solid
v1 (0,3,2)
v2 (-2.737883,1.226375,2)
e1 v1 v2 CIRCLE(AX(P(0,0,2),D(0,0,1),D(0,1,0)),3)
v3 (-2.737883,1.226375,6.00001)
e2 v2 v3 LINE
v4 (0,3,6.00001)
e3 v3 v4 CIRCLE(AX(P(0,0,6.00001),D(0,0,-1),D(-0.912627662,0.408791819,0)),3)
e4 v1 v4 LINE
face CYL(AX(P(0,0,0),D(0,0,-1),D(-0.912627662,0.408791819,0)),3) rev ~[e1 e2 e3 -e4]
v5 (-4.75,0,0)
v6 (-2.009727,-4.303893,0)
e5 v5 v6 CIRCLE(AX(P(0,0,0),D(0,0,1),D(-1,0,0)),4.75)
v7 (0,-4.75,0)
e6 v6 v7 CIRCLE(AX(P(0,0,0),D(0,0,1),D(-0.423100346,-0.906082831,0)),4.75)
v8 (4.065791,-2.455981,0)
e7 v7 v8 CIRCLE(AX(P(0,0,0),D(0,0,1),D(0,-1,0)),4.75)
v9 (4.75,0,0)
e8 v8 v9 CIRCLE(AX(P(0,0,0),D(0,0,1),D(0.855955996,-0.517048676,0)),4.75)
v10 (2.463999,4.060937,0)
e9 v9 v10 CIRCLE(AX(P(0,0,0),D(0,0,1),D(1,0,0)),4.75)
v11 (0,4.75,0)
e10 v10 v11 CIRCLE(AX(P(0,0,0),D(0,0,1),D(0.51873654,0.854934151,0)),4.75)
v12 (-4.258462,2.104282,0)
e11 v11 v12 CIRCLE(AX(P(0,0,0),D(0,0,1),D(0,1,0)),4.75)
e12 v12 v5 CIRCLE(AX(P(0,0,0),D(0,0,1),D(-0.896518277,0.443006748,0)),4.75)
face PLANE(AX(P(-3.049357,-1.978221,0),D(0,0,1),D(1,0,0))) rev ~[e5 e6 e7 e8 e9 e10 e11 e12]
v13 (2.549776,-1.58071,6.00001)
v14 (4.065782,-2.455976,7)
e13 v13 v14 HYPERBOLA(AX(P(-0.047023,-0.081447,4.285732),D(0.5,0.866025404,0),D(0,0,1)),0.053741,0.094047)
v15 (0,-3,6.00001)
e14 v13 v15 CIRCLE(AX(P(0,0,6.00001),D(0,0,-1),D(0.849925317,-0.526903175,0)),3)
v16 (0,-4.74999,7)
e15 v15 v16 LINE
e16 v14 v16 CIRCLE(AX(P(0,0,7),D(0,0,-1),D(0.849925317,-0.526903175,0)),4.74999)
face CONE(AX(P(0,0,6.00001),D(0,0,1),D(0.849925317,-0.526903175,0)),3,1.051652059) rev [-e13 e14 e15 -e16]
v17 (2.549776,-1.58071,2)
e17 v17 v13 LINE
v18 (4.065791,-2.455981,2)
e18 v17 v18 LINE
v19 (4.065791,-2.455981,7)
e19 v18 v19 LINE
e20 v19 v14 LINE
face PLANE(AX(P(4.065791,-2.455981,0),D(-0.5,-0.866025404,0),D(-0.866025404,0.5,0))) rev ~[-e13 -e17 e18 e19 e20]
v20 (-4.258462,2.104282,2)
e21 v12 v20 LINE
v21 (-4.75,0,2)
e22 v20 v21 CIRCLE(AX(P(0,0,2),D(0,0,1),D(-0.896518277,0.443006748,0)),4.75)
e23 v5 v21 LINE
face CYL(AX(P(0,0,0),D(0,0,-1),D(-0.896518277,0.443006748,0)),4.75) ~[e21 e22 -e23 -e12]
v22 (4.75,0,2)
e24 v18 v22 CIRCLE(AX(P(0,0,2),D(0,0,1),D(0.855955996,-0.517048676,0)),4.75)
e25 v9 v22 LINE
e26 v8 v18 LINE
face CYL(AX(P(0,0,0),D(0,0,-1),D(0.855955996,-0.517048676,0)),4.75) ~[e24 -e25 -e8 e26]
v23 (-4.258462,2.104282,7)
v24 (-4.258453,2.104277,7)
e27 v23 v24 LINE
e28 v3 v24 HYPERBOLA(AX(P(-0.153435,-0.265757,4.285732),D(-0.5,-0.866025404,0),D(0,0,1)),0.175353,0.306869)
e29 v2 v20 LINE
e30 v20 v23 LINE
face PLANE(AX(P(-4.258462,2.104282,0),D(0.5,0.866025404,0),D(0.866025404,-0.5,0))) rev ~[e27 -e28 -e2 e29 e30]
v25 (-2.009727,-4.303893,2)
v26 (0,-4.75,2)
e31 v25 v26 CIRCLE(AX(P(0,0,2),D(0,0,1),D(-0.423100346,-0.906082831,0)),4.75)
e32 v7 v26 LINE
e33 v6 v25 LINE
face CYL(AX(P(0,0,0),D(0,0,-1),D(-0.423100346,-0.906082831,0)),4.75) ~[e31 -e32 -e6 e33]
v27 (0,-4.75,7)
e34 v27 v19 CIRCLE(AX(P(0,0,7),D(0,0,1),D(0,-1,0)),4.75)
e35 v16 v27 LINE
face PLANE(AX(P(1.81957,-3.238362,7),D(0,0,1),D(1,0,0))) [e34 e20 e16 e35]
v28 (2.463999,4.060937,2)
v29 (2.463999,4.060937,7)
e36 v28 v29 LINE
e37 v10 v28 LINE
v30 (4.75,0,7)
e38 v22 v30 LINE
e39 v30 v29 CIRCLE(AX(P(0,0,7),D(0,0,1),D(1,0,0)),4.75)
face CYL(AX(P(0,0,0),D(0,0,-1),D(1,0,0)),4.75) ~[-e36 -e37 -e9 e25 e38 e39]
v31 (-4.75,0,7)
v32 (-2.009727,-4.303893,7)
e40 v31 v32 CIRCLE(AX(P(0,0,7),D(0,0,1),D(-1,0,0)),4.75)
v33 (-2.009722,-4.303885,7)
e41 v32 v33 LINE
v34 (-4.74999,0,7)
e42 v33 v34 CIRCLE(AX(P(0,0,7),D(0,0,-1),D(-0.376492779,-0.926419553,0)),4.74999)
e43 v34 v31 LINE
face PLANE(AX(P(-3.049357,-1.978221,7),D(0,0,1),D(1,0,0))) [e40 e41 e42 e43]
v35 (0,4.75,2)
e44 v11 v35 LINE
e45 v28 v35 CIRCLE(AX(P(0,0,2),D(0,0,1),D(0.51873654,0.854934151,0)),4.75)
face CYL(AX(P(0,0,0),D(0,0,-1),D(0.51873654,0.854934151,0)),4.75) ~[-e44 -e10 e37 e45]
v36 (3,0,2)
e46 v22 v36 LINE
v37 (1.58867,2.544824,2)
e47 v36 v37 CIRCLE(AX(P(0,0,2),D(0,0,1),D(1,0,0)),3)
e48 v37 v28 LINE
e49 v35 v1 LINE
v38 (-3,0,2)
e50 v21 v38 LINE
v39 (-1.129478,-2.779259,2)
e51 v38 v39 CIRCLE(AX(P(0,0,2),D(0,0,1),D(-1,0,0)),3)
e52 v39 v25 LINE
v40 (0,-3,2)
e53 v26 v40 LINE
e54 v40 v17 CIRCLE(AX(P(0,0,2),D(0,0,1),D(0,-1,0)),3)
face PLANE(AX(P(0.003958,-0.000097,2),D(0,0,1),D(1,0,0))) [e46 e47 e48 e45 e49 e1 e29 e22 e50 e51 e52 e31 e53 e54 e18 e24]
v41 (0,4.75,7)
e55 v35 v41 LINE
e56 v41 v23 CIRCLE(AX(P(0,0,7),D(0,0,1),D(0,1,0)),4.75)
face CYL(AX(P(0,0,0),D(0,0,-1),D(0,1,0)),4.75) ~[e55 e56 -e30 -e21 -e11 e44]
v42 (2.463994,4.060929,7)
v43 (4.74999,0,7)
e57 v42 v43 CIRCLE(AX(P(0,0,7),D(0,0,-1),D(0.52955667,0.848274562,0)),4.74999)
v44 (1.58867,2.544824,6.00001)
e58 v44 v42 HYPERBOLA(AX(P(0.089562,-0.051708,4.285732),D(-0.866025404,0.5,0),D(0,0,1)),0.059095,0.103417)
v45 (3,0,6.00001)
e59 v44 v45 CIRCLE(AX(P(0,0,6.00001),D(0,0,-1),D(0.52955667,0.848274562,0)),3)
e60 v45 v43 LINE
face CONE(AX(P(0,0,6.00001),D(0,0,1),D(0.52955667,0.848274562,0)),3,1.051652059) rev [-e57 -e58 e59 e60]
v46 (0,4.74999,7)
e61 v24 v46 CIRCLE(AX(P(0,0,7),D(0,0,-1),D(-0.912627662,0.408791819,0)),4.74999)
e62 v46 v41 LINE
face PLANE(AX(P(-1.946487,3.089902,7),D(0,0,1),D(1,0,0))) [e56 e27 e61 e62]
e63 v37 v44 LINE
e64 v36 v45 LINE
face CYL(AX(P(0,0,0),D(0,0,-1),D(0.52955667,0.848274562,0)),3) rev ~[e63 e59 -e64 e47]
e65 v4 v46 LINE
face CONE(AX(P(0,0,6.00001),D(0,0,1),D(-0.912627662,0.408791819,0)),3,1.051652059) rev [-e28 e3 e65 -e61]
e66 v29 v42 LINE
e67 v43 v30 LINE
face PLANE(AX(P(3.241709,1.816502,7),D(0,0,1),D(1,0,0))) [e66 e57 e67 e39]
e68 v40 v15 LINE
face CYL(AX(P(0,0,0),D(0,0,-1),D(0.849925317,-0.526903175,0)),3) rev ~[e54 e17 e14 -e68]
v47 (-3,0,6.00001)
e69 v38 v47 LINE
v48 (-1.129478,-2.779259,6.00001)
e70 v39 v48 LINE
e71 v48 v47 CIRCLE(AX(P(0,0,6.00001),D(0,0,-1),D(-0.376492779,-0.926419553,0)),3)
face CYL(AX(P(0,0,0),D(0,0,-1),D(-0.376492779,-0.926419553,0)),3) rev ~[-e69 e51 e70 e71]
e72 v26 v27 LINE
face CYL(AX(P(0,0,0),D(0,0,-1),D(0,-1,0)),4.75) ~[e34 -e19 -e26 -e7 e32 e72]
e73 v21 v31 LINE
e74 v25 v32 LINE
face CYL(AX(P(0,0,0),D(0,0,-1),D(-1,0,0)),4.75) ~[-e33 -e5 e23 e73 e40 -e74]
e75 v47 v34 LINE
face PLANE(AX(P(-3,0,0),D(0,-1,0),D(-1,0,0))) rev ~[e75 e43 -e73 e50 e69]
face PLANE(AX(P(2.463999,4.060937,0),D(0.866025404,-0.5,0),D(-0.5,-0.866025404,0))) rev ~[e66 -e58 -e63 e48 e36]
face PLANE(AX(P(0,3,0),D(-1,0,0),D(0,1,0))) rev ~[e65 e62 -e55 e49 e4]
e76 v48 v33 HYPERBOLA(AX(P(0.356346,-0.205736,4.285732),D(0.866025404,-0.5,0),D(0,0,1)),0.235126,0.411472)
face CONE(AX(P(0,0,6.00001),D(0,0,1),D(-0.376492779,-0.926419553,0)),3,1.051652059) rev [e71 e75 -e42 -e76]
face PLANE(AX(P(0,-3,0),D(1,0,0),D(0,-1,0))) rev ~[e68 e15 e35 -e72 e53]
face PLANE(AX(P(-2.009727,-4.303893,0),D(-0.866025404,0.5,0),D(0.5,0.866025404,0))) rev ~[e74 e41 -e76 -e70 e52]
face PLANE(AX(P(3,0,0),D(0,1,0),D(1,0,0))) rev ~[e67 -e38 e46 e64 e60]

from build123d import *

# Parameters (mm, degrees)
F1_DEPTH   = 2
F2_DEPTH   = 7
F3_SIZE2   = 1.74999
F3_SIZE    = 0.99999
F3_2_SIZE2 = 1.74999
F3_2_SIZE  = 0.99999
F3_3_SIZE2 = 1.74999
F3_3_SIZE  = 0.99999
F3_4_SIZE2 = 1.74999
F3_4_SIZE  = 0.99999


# Not quite as in the source:
# - a fillet or chamfer is up to 0.001 mm smaller than in the source, because OpenCascade refuses the exact size


with BuildPart() as f1:
    # F0 (on Top) → F1 (new body)
    with BuildSketch(Plane.XY):
        with BuildLine():
            ThreePointArc((2.5497759502, -1.5807095255), (2.8852493697, -0.8217883394), (3, 0))
            ThreePointArc((3, 0), (2.6235481729, 1.4549896853), (1.5886700104, 2.544823687))
            ThreePointArc((1.5886700104, 2.544823687), (0.8262956308, 2.8839617769), (0, 3))
            ThreePointArc((0, 3), (-1.6310845521, 2.51784892), (-2.7378829853, 1.226375456))
            ThreePointArc((-2.7378829853, 1.226375456), (-2.9337389928, 0.6270370979), (-3, 0))
            ThreePointArc((-3, 0), (-2.488818496, -1.6750470125), (-1.1294783373, -2.7792586575))
            ThreePointArc((-1.1294783373, -2.7792586575), (-0.5754233343, -2.944297537), (0, -3))
            ThreePointArc((0, -3), (1.4590872872, -2.6212715022), (2.5497759502, -1.5807095255))
        make_face()
        with BuildLine():
            Line((0, -4.75), (0, -3))
            ThreePointArc((0, -3), (-0.5754233343, -2.944297537), (-1.1294783373, -2.7792586575))
            Line((-1.1294783373, -2.7792586575), (-2.0097266443, -4.3038934484))
            ThreePointArc((-2.0097266443, -4.3038934484), (-1.0293216504, -4.6371324048), (0, -4.75))
        make_face()
        with BuildLine():
            Line((4.75, 0), (3, 0))
            ThreePointArc((3, 0), (2.8852493697, -0.8217883394), (2.5497759502, -1.5807095255))
            Line((2.5497759502, -1.5807095255), (4.0657909798, -2.455981211))
            ThreePointArc((4.0657909798, -2.455981211), (4.5757516953, -1.2747534754), (4.75, 0))
        make_face()
        with BuildLine():
            ThreePointArc((-3, 0), (-2.9337389928, 0.6270370979), (-2.7378829853, 1.226375456))
            Line((-2.7378829853, 1.226375456), (-4.2584618162, 2.1042820533))
            ThreePointArc((-4.2584618162, 2.1042820533), (-4.625483414, 1.0804643384), (-4.75, 0))
            Line((-4.75, 0), (-3, 0))
        make_face()
        with BuildLine():
            ThreePointArc((0, 3), (0.8262956308, 2.8839617769), (1.5886700104, 2.544823687))
            Line((1.5886700104, 2.544823687), (2.4639985646, 4.0609372162))
            ThreePointArc((2.4639985646, 4.0609372162), (1.2792670212, 4.5744918722), (0, 4.75))
            Line((0, 4.75), (0, 3))
        make_face()
    extrude(amount=F1_DEPTH)

    # F0 (on Top) → F2 (join)
    with BuildSketch(Plane.XY):
        with BuildLine():
            Line((-2.0097266443, -4.3038934484), (-1.1294783373, -2.7792586575))
            ThreePointArc((-1.1294783373, -2.7792586575), (-2.488818496, -1.6750470125), (-3, 0))
            Line((-3, 0), (-4.75, 0))
            ThreePointArc((-4.75, 0), (-4.0067880877, -2.5511074497), (-2.0097266443, -4.3038934484))
        make_face()
        with BuildLine():
            Line((4.0657909798, -2.455981211), (2.5497759502, -1.5807095255))
            ThreePointArc((2.5497759502, -1.5807095255), (1.4590872872, -2.6212715022), (0, -3))
            Line((0, -3), (0, -4.75))
            ThreePointArc((0, -4.75), (2.334158226, -4.1369318795), (4.0657909798, -2.455981211))
        make_face()
        with BuildLine():
            ThreePointArc((1.5886700104, 2.544823687), (2.6235481729, 1.4549896853), (3, 0))
            Line((3, 0), (4.75, 0))
            ThreePointArc((4.75, 0), (4.1392326089, 2.3300758376), (2.4639985646, 4.0609372162))
            Line((2.4639985646, 4.0609372162), (1.5886700104, 2.544823687))
        make_face()
        with BuildLine():
            ThreePointArc((-2.7378829853, 1.226375456), (-1.6310845521, 2.51784892), (0, 3))
            Line((0, 3), (0, 4.75))
            ThreePointArc((0, 4.75), (-2.5067070278, 4.0347143488), (-4.2584618162, 2.1042820533))
            Line((-4.2584618162, 2.1042820533), (-2.7378829853, 1.226375456))
        make_face()
    extrude(amount=F2_DEPTH)

    # F3 (size 1 and 1.75 in the source; OpenCascade refuses exactly that, so slightly less here)
    f3_edges = [f1.edges().sort_by_distance(p)[0] for p in [
        (-2.488818, -1.675047, 7),
    ]]
    f3_side = f1.faces().sort_by_distance((-2.488818, -1.675047, 4.5))[0]
    chamfer(f3_edges, length=F3_SIZE, length2=F3_SIZE2, reference=f3_side)

    # F3#2 (size 1 and 1.75 in the source; OpenCascade refuses exactly that, so slightly less here)
    f3_2_edges = [f1.edges().sort_by_distance(p)[0] for p in [
        (-1.631085, 2.517849, 7),
    ]]
    f3_2_side = f1.faces().sort_by_distance((-1.631085, 2.517849, 4.5))[0]
    chamfer(f3_2_edges, length=F3_2_SIZE, length2=F3_2_SIZE2, reference=f3_2_side)

    # F3#3 (size 1 and 1.75 in the source; OpenCascade refuses exactly that, so slightly less here)
    f3_3_edges = [f1.edges().sort_by_distance(p)[0] for p in [
        (2.623548, 1.45499, 7),
    ]]
    f3_3_side = f1.faces().sort_by_distance((2.623548, 1.45499, 4.5))[0]
    chamfer(f3_3_edges, length=F3_3_SIZE, length2=F3_3_SIZE2, reference=f3_3_side)

    # F3#4 (size 1 and 1.75 in the source; OpenCascade refuses exactly that, so slightly less here)
    f3_4_edges = [f1.edges().sort_by_distance(p)[0] for p in [
        (1.459087, -2.621272, 7),
    ]]
    f3_4_side = f1.faces().sort_by_distance((1.459087, -2.621272, 4.5))[0]
    chamfer(f3_4_edges, length=F3_4_SIZE, length2=F3_4_SIZE2, reference=f3_4_side)


solid = f1.part
